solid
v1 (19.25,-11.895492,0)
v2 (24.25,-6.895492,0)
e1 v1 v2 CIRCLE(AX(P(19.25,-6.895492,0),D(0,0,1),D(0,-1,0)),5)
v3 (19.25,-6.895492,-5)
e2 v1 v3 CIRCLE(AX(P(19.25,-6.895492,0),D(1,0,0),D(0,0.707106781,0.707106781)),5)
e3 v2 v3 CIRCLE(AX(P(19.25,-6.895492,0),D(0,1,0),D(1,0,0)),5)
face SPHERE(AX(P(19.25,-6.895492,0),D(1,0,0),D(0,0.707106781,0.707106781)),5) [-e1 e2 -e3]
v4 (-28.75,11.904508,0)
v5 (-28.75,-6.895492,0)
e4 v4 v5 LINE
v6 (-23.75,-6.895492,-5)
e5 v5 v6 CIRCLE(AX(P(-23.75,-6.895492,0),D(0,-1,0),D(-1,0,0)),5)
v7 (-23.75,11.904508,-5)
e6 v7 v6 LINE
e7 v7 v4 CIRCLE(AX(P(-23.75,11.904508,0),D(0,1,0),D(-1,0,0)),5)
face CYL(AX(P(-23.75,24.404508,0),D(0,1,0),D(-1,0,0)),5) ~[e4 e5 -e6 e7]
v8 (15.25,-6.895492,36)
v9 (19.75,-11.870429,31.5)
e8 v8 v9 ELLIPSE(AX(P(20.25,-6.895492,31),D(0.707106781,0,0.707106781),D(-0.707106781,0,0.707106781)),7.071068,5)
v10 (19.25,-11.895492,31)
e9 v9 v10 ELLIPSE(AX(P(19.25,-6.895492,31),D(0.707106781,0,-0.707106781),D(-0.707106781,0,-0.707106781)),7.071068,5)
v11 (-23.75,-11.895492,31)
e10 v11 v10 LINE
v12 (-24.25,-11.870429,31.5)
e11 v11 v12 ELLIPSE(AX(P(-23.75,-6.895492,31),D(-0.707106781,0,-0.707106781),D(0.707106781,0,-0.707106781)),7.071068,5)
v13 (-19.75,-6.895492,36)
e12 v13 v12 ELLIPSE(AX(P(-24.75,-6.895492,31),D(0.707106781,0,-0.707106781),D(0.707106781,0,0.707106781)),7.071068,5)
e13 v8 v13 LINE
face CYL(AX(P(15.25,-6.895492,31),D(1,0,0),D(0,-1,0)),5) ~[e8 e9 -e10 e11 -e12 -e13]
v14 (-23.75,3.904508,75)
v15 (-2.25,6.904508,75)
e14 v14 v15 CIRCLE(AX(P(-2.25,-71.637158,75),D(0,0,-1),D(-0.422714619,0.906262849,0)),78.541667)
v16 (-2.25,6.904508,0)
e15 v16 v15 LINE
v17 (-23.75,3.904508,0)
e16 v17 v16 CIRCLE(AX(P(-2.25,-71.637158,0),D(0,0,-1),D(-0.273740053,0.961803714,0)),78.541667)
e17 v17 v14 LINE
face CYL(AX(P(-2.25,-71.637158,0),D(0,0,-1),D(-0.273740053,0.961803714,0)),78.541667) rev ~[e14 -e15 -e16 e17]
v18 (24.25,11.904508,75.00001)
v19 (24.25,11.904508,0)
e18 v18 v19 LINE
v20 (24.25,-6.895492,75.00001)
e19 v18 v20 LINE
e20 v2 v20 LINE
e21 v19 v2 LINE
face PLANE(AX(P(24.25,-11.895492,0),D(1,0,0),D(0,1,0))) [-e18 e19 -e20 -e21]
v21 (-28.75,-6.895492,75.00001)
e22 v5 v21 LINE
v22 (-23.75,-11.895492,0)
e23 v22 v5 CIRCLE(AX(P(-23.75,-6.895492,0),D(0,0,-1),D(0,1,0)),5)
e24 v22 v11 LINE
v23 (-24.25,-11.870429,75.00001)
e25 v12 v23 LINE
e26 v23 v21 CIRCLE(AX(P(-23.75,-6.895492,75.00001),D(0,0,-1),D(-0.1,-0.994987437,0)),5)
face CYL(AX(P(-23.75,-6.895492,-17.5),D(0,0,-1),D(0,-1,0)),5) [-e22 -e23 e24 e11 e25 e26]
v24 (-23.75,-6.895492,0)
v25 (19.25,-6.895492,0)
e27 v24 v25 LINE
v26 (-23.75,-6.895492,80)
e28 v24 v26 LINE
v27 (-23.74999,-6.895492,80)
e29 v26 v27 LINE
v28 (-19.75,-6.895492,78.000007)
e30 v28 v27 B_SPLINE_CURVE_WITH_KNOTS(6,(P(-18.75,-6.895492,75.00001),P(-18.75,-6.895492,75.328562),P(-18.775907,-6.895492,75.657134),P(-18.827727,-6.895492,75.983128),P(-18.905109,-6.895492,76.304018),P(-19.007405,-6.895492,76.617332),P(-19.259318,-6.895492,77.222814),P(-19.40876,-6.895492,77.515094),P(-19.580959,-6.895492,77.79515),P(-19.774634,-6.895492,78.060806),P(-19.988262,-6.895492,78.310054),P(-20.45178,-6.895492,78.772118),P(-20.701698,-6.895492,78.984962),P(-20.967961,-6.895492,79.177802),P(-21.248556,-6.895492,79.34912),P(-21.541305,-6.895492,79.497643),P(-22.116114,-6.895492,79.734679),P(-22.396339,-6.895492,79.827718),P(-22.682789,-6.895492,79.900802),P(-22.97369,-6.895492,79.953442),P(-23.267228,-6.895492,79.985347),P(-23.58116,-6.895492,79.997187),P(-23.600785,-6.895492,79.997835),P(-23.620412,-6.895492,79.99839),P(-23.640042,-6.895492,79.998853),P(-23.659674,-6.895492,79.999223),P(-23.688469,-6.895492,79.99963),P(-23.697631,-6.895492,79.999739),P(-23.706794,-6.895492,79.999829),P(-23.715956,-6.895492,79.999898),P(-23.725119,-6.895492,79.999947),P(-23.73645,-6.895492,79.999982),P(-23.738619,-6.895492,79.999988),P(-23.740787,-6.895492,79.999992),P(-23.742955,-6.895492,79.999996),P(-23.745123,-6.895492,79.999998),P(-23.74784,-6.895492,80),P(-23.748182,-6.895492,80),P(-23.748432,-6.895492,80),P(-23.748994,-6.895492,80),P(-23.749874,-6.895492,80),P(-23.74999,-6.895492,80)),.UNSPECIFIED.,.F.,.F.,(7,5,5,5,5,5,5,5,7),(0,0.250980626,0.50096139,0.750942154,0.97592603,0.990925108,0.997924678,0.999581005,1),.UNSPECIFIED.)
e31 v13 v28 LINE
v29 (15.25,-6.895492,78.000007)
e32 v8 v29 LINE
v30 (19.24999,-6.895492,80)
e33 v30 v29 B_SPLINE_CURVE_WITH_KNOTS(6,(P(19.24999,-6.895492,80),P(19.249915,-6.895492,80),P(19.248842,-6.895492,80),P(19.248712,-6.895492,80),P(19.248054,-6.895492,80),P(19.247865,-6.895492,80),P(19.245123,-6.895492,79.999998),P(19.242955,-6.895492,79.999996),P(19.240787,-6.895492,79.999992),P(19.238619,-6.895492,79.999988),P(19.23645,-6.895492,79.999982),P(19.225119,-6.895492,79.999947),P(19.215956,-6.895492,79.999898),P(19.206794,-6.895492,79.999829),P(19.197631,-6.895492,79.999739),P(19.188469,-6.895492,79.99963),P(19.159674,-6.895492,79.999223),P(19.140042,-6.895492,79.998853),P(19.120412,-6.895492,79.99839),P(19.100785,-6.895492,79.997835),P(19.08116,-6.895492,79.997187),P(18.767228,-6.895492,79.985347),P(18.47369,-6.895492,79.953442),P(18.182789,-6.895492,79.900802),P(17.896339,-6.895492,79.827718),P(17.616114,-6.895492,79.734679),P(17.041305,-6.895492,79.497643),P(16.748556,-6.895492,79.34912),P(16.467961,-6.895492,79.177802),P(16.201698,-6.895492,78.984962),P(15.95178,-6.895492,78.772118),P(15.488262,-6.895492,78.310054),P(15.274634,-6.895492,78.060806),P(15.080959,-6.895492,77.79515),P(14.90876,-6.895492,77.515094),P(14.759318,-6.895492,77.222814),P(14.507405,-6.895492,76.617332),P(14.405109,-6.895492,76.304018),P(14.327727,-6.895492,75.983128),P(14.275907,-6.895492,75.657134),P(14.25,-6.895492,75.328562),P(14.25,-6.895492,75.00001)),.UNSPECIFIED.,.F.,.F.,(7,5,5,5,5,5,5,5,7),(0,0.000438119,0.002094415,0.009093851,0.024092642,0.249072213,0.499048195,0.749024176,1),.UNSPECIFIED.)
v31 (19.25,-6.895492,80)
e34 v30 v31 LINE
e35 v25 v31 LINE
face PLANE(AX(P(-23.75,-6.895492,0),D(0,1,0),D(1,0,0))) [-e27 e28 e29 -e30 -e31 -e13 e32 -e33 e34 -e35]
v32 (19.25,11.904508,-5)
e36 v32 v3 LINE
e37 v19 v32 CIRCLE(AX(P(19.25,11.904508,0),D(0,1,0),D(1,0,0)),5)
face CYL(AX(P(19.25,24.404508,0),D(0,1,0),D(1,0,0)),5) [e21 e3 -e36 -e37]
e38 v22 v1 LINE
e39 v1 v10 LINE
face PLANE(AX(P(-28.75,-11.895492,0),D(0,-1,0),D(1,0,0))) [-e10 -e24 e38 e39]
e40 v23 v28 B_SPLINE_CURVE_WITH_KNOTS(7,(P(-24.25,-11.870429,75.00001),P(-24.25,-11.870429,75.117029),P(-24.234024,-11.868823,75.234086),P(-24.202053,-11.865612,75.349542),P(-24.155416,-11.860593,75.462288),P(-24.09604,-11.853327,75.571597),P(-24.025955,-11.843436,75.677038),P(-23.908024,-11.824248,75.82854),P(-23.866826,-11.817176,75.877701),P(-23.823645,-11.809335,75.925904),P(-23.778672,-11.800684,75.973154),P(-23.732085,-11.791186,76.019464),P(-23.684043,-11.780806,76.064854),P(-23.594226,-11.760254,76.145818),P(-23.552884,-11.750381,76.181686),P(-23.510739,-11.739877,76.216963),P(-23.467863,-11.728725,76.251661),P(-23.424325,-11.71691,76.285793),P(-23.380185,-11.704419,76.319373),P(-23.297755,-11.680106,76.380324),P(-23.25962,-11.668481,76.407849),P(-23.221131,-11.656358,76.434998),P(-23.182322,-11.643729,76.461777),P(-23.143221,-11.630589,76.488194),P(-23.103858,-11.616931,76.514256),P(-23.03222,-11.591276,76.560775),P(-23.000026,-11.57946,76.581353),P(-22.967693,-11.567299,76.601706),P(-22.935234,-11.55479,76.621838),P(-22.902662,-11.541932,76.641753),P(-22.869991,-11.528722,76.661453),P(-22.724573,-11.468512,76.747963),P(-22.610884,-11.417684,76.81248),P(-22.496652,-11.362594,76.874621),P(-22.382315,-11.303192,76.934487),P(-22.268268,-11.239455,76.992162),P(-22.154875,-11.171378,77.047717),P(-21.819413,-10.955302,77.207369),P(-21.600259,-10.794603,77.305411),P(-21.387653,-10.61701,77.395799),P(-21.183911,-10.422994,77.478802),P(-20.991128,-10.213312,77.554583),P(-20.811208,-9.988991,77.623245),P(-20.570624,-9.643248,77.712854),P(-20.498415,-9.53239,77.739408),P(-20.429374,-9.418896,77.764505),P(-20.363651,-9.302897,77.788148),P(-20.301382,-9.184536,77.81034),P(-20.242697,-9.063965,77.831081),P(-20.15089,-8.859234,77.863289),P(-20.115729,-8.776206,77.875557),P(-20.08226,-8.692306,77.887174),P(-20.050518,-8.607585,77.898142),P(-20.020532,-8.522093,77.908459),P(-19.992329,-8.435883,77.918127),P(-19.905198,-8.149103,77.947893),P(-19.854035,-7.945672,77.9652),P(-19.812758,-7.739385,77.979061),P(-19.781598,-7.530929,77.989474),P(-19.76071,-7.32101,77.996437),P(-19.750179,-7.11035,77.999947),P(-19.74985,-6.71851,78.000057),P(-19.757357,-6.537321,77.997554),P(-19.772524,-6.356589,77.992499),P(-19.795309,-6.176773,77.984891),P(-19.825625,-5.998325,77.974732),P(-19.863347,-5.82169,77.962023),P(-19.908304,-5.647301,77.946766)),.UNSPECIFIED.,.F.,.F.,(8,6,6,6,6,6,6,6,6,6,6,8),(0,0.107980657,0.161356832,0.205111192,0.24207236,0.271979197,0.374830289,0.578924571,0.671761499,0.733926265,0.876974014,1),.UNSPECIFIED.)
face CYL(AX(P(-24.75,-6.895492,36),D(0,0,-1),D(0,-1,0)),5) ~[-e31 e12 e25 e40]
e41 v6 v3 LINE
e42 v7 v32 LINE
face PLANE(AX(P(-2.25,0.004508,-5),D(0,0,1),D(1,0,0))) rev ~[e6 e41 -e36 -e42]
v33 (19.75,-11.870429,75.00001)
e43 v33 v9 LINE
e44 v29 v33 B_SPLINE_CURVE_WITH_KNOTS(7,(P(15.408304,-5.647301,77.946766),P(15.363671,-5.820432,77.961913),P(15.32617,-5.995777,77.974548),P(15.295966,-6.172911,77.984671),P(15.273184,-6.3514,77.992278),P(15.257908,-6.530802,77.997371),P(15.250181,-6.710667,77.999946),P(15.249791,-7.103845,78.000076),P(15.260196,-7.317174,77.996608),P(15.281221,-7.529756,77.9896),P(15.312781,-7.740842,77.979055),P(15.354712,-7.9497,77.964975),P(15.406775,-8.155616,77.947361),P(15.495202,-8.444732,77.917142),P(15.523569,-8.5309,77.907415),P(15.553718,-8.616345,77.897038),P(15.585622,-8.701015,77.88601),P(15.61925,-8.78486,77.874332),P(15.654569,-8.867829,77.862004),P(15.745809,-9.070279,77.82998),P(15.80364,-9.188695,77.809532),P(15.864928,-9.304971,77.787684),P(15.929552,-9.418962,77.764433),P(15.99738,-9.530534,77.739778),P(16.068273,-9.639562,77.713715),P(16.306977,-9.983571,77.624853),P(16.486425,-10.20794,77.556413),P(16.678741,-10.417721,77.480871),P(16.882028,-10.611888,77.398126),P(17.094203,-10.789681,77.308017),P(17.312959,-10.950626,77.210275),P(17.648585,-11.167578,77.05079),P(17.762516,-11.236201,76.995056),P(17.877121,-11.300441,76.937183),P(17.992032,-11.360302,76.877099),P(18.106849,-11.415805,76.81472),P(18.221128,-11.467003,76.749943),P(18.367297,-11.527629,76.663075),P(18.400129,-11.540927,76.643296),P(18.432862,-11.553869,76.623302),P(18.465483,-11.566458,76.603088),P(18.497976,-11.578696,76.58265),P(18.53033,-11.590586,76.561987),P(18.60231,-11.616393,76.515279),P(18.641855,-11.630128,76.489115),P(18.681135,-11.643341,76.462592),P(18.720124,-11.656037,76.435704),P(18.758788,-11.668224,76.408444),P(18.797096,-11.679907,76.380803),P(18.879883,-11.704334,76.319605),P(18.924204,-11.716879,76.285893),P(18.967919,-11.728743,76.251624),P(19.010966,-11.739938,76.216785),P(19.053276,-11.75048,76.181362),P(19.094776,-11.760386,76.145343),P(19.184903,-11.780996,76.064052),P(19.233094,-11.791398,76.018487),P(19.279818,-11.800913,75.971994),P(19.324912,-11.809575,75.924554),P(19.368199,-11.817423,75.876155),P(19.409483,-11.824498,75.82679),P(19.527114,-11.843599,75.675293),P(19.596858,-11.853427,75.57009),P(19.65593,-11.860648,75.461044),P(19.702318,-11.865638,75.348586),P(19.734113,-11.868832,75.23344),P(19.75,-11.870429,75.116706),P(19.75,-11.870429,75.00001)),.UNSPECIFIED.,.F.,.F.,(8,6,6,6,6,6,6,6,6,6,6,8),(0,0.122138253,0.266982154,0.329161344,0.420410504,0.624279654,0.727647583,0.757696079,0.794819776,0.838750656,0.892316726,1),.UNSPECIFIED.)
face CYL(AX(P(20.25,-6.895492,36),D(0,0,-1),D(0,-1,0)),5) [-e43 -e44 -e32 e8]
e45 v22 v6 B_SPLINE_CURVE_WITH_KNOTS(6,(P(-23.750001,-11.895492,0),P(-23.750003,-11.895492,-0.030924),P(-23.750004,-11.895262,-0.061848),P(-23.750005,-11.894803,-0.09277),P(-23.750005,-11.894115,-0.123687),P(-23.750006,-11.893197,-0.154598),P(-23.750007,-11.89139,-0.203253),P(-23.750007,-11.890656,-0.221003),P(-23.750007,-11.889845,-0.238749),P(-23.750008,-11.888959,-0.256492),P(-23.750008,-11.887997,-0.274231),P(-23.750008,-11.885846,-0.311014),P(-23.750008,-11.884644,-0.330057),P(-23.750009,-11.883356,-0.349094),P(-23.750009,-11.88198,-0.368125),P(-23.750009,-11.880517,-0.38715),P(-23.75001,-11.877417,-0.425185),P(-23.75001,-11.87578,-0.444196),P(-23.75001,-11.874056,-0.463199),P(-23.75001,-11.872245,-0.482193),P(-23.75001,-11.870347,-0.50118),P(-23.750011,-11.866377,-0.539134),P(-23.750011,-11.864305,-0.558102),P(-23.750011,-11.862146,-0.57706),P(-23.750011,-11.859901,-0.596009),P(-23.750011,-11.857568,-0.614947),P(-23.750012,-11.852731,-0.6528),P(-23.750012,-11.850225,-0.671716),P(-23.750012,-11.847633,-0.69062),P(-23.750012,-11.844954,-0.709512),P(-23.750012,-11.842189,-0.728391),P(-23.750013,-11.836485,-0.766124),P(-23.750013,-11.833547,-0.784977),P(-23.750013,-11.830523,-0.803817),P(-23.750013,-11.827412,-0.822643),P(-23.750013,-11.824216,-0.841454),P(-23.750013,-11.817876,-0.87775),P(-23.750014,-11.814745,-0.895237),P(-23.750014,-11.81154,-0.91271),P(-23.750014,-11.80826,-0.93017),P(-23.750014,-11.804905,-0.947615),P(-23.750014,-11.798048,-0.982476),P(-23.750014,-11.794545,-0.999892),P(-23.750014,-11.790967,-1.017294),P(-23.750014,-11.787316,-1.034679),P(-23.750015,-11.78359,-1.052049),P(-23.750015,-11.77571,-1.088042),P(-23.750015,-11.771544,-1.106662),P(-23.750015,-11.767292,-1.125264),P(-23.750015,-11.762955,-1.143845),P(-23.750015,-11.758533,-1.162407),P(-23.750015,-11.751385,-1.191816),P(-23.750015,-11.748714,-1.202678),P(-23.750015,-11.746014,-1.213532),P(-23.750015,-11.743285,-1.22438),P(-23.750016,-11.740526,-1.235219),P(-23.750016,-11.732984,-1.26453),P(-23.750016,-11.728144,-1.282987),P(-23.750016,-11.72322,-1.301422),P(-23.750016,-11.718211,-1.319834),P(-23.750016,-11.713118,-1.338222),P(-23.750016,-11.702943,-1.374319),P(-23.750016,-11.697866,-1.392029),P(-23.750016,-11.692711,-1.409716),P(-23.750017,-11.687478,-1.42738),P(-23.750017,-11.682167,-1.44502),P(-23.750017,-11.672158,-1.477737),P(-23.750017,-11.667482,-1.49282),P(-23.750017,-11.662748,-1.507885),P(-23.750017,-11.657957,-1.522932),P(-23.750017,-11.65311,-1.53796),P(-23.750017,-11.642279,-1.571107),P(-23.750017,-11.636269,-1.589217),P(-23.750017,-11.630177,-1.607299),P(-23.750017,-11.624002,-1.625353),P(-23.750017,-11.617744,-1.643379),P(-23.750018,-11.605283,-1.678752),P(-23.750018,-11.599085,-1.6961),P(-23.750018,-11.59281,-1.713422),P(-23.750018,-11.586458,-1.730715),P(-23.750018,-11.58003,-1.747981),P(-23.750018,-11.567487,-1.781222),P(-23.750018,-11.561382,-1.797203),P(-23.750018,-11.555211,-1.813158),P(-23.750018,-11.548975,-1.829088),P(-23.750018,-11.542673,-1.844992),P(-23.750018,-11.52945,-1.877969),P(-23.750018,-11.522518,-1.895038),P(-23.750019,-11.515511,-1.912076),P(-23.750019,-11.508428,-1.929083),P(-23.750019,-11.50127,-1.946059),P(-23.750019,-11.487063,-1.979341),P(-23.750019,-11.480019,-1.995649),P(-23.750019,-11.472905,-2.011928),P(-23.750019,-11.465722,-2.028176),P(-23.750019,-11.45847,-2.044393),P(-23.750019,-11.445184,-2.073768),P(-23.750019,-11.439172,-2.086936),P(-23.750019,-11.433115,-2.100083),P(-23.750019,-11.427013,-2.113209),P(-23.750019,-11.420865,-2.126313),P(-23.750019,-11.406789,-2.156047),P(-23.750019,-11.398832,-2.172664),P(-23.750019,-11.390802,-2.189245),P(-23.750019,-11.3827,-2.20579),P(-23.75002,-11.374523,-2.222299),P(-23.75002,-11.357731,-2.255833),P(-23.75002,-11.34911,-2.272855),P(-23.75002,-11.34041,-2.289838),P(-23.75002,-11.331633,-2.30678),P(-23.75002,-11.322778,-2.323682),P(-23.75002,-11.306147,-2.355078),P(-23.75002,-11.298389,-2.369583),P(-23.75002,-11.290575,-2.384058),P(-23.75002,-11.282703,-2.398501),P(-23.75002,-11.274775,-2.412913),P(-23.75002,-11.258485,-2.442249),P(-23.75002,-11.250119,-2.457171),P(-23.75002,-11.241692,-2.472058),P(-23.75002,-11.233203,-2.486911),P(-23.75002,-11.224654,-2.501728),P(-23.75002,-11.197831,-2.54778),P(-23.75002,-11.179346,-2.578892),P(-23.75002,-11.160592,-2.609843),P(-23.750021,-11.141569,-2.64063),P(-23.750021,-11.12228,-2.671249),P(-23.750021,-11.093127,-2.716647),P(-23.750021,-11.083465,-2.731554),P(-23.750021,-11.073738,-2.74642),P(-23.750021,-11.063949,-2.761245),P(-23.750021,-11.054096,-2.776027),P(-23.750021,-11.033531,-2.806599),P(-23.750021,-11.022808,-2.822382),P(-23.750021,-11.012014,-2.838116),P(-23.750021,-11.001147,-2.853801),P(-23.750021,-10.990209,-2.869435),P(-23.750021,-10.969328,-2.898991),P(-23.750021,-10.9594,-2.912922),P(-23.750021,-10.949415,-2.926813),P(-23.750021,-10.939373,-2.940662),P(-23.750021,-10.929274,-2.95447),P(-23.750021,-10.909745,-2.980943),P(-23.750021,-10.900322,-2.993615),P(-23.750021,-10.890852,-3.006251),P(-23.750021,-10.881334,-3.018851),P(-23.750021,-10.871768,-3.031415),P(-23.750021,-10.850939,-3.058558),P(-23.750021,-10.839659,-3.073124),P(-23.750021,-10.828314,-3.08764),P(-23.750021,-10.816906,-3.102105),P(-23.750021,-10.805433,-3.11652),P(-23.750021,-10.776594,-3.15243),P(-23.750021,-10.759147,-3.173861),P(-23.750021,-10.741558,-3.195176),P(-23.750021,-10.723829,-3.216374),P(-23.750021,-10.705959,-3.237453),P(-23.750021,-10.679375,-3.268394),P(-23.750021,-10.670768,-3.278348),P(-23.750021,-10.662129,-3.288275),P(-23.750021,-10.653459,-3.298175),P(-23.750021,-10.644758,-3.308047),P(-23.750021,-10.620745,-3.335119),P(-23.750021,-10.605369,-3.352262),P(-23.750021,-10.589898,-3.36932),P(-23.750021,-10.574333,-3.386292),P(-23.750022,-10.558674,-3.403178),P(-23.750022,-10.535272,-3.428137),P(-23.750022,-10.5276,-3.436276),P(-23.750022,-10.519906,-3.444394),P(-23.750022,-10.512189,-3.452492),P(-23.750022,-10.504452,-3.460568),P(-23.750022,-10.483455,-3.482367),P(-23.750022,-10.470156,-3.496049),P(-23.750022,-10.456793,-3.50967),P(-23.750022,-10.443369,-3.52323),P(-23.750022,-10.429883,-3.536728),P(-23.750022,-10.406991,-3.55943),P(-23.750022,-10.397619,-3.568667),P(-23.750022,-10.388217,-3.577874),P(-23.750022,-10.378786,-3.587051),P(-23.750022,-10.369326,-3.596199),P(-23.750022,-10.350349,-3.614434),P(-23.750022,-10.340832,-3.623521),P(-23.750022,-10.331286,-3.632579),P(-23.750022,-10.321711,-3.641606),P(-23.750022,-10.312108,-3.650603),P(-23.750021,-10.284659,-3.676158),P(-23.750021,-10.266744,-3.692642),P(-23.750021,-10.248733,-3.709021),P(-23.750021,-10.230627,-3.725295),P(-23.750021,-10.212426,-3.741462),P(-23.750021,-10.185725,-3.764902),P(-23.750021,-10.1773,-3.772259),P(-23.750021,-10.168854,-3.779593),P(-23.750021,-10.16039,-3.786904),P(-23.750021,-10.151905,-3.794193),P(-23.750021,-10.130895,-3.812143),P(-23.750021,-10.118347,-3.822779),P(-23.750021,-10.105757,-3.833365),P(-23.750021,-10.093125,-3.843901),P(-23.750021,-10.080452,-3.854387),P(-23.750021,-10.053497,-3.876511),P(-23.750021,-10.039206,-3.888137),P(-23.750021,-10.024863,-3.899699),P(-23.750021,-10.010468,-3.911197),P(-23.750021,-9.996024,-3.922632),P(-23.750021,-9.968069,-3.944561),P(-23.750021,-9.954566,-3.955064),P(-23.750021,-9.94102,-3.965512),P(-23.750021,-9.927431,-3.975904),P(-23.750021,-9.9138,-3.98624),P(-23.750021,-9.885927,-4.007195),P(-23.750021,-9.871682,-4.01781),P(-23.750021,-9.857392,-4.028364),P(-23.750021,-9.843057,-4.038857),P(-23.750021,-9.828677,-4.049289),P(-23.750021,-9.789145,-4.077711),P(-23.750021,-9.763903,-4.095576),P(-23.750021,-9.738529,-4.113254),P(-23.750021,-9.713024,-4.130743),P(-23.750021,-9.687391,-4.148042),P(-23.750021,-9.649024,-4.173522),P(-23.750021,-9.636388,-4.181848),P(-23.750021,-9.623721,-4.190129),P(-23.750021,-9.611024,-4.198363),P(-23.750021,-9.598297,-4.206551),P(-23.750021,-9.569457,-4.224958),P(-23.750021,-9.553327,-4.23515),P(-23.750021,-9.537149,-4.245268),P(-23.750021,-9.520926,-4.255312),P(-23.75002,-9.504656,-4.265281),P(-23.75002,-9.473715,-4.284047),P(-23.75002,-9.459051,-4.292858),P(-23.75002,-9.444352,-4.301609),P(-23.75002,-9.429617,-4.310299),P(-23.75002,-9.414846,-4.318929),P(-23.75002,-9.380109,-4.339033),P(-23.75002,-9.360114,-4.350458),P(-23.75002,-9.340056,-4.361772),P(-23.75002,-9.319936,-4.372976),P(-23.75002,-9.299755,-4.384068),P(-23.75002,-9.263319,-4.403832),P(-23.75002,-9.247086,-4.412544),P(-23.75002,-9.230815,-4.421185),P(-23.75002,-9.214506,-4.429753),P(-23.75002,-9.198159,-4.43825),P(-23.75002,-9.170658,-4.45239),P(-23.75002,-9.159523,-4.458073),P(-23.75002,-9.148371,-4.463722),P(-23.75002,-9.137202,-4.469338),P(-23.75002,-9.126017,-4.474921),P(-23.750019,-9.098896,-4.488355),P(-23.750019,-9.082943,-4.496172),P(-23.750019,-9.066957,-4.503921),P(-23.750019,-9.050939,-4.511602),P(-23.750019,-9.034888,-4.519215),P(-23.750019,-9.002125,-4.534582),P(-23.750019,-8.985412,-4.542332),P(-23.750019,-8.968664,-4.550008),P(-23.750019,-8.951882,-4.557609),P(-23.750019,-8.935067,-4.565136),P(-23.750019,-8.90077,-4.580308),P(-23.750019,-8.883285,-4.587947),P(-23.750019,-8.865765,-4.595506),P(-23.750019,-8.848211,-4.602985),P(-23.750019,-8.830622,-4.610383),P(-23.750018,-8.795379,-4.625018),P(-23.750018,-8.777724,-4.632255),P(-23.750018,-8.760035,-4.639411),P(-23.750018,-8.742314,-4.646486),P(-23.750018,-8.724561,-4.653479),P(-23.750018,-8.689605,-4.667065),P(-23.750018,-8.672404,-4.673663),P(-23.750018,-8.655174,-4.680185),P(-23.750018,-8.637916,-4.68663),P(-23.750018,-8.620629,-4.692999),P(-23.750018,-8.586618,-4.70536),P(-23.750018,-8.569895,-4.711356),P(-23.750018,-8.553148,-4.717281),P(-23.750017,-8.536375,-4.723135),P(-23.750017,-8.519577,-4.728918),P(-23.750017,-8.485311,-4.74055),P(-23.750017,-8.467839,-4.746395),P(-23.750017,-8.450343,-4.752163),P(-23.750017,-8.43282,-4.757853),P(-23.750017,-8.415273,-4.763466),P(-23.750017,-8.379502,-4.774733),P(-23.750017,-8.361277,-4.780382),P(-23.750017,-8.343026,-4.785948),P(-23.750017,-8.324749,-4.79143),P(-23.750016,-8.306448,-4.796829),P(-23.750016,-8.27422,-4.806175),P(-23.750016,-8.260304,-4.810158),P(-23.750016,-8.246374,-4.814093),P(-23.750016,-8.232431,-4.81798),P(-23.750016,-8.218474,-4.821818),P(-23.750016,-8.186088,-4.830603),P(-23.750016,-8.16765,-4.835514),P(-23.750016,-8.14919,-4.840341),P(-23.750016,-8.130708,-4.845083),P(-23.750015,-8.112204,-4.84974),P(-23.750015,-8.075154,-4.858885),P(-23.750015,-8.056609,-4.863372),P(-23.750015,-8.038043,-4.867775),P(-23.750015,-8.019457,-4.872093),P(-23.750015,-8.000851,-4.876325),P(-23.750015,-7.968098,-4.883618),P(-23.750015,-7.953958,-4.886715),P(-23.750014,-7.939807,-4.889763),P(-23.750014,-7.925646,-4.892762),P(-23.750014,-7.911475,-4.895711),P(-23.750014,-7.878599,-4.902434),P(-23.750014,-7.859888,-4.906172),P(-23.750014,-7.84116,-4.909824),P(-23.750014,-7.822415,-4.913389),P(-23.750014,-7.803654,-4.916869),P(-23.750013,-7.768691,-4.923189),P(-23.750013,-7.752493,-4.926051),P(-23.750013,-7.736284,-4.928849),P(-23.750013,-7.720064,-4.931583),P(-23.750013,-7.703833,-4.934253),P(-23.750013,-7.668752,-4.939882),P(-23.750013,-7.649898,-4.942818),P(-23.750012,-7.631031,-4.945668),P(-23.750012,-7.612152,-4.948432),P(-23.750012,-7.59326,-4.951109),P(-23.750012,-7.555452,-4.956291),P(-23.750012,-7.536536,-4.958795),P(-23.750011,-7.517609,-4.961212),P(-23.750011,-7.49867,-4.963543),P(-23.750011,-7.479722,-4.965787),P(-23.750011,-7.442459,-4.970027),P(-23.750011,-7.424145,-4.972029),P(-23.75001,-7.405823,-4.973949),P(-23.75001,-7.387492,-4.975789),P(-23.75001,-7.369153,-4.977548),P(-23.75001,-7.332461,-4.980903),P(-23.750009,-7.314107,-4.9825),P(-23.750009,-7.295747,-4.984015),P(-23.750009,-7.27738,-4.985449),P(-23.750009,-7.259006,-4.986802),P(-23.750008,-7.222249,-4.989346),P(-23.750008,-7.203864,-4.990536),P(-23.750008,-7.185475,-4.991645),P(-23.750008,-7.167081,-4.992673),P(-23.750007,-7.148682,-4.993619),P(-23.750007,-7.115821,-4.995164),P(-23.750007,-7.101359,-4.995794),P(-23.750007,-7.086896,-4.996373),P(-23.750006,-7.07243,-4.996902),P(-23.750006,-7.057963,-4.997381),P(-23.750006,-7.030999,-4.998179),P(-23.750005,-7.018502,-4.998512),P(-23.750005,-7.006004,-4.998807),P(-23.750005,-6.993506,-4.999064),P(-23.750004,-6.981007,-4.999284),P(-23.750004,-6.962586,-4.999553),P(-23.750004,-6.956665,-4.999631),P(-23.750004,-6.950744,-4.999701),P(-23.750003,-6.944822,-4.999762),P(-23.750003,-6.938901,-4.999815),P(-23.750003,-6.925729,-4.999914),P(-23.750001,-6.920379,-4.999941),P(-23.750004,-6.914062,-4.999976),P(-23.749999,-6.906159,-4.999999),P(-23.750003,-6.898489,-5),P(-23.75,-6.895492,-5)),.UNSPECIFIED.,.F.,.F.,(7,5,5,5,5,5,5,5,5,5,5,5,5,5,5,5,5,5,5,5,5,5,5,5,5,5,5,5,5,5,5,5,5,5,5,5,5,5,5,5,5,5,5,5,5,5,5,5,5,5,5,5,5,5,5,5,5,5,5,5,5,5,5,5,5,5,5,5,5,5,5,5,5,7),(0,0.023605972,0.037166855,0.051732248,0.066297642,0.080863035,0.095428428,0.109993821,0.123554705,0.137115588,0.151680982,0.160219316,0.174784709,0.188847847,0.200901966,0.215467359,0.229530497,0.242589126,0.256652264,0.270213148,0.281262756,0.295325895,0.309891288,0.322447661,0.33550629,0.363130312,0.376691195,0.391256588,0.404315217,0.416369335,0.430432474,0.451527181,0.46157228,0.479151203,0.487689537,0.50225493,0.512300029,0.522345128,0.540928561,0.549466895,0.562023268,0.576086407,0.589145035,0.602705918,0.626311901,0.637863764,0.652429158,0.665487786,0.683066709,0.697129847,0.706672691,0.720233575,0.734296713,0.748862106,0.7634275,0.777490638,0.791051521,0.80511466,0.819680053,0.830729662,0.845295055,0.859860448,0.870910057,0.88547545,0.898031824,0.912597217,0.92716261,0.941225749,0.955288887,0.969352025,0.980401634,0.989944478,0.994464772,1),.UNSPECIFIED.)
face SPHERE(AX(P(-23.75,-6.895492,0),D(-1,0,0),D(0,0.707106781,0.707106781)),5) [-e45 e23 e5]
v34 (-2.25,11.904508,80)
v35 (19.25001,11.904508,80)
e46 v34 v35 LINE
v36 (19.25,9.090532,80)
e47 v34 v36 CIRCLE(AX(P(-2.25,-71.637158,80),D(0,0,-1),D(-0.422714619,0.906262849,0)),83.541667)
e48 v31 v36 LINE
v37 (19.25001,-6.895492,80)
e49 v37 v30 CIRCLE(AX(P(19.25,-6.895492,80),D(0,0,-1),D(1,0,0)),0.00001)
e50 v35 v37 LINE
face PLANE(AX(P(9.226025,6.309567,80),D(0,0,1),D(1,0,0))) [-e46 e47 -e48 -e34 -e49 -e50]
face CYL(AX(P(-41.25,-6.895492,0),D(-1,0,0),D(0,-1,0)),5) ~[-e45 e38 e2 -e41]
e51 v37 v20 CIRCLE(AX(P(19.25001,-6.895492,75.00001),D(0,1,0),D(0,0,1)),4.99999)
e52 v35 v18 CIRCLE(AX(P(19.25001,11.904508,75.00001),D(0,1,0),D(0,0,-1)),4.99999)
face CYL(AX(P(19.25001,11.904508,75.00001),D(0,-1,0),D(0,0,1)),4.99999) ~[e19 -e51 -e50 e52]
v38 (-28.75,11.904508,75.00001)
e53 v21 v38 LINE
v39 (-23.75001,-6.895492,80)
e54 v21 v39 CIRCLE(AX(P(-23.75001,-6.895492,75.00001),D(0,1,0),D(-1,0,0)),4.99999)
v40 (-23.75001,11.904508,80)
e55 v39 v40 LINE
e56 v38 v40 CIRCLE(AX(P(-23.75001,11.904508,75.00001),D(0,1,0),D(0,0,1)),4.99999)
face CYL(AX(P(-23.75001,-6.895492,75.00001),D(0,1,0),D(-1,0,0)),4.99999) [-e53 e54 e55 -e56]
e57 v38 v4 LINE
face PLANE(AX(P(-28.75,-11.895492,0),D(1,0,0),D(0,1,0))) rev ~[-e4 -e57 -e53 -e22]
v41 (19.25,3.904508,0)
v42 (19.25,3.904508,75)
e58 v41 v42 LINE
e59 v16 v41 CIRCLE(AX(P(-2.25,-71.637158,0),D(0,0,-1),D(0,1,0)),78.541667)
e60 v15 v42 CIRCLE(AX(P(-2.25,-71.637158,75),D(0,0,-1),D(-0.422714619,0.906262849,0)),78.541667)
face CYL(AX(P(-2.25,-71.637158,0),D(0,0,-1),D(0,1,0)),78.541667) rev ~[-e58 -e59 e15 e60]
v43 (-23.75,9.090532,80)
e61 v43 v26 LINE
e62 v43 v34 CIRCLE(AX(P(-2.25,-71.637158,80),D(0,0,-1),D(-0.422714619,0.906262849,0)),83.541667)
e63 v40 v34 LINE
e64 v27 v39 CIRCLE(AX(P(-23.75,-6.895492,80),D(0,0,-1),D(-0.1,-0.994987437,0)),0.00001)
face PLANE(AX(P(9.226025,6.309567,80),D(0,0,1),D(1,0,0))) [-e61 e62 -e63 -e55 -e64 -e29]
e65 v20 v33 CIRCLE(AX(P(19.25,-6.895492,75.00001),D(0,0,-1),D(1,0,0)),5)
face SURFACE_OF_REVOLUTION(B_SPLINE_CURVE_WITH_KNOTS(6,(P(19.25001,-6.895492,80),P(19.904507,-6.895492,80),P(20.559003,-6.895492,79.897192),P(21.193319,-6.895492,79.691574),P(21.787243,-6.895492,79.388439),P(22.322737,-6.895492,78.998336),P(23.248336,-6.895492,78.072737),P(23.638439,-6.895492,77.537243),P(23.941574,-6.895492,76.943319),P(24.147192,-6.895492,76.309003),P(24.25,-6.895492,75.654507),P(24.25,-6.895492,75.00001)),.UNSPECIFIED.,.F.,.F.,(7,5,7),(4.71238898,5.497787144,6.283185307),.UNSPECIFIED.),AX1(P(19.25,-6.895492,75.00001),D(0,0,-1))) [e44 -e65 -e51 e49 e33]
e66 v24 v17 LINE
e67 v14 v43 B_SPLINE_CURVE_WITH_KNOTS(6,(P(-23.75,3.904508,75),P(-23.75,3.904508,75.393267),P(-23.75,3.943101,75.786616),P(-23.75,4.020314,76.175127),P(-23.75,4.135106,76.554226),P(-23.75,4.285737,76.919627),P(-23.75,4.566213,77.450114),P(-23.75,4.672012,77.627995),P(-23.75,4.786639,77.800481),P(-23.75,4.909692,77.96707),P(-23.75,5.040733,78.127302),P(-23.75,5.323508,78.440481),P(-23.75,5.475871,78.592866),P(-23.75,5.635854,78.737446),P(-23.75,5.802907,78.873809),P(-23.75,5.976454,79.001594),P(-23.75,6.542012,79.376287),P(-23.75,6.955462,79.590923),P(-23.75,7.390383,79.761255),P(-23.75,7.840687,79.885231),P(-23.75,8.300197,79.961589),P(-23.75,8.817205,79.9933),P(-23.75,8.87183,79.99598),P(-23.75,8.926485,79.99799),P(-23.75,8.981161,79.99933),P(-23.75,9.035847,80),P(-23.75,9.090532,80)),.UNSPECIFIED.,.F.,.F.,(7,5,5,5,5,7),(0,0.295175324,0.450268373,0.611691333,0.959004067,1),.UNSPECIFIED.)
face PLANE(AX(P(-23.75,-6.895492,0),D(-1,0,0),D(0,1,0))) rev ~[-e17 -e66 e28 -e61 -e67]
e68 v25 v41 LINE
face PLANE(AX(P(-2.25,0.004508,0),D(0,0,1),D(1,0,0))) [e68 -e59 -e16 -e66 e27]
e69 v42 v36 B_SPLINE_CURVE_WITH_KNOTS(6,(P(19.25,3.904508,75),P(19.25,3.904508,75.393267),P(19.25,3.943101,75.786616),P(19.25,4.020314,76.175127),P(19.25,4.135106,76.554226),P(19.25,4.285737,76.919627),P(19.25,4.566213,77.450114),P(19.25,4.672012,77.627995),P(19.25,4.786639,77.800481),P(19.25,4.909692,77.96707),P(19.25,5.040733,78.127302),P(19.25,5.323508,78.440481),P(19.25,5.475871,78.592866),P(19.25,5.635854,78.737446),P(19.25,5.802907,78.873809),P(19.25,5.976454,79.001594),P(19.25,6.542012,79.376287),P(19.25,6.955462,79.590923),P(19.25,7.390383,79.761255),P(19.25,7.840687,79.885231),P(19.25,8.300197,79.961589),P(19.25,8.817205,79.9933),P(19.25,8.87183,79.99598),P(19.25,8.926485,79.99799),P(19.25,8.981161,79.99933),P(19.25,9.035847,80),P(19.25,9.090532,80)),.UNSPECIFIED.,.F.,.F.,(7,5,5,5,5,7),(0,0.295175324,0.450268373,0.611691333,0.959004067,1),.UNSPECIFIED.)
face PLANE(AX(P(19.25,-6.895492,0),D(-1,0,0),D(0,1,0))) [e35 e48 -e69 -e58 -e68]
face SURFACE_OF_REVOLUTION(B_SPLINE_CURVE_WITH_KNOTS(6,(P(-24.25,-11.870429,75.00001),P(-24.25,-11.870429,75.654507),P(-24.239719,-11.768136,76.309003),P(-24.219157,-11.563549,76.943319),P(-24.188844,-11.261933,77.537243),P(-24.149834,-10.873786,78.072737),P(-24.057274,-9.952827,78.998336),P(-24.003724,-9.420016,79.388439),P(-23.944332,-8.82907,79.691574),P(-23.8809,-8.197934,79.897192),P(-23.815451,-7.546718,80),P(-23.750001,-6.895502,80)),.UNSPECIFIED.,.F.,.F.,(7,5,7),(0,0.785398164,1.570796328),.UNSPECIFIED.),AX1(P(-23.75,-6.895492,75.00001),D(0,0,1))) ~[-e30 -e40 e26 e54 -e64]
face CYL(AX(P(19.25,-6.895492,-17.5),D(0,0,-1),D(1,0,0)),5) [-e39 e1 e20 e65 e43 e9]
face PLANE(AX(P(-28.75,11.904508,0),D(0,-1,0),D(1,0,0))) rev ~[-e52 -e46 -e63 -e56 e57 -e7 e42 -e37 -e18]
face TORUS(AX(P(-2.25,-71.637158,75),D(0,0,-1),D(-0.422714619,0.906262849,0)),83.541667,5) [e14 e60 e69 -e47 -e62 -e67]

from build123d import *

# Parameters (mm, degrees)
F0_W         = 53
F0_H         = 23.8
F0_W_2       = 43
F0_H_2       = 13.8
F1_DEPTH     = 80
F2_DEPTH     = 5
F3_W         = 35
F3_H         = 44
F4_DEPTH     = 25
F5_T1_DEPTH  = 78
F5_T3_DEPTH  = 110
F5_T5_DEPTH  = 35
F5_T7_DEPTH  = 56.5
F5_T13_DEPTH = 69
F5_T17_DEPTH = 47.5
F5_T24_DEPTH = 47.5
F5_T28_DEPTH = 69
F6_T1_DEPTH  = 31.3
F6_S5_W      = 5
F6_S5_H      = 5
F6_T6_DEPTH  = 5
F6_S11_W     = 5
F6_S11_H     = 5
F6_T12_DEPTH = 5
F7_R         = 4.99999
F9_DEPTH     = 80
F10_T4_ANGLE = 50.0121835392


# Not quite as in the source:
# - a fillet or chamfer that OpenCascade refuses, or shapes differently, is made with other operations: its cross-section is extruded or revolved along the edge and cut away or added
# - a fillet or chamfer is up to 0.001 mm smaller than in the source, because OpenCascade refuses the exact size


with BuildPart() as f1:
    # F0 (on Top) → F1 (new body)
    with BuildSketch(Plane.XY):
        with Locations((-2.25, 0.0045082584)):
            Rectangle(F0_W, F0_H)
        with Locations((-2.25, 0.0045082584)):
            Rectangle(F0_W_2, F0_H_2, mode=Mode.SUBTRACT)
    extrude(amount=F1_DEPTH)

    # F0 (on Top) → F2 (join)
    with BuildSketch(Plane.XY):
        with Locations((-2.25, 0.0045082584)):
            Rectangle(F0_W, F0_H)
        with Locations((-2.25, 0.0045082584)):
            Rectangle(F0_W_2, F0_H_2, mode=Mode.SUBTRACT)
        with Locations((-2.25, 0.0045082584)):
            Rectangle(F0_W_2, F0_H_2)
    extrude(amount=-F2_DEPTH)

    # F3 (on face) → F4 (cut)
    with BuildSketch(Plane(origin=(0, -6.8954917416, 0), x_dir=(-1, 0, 0), z_dir=(0, 1, 0))):
        with Locations((2.25, 58)):
            Rectangle(F3_W, F3_H)
    extrude(amount=-F4_DEPTH, mode=Mode.SUBTRACT)

    # F5: fillet of radius 5 on 6 edges, made by hand

    # F5_s2 → F5_t1 (cut)
    with BuildSketch(Plane.YZ.offset(-41.25)):
        with BuildLine():
            ThreePointArc((-11.8954917416, 0), (-10.4310256475, -3.5355339059), (-6.8954917416, -5))
            Line((-6.8954917416, -5), (-11.8954917416, -5))
            Line((-11.8954917416, -5), (-11.8954917416, 0))
        make_face()
    extrude(amount=F5_T1_DEPTH, mode=Mode.SUBTRACT)

    # F5_s4 → F5_t3 (cut)
    with BuildSketch(Plane.XY.offset(-17.5)):
        with BuildLine():
            ThreePointArc((-23.75, -11.8954917416), (-27.2855339059, -10.4310256475), (-28.75, -6.8954917416))
            Line((-28.75, -6.8954917416), (-28.75, -11.8954917416))
            Line((-28.75, -11.8954917416), (-23.75, -11.8954917416))
        make_face()
        with BuildLine():
            ThreePointArc((24.25, -6.8954917416), (22.7855339059, -10.4310256475), (19.25, -11.8954917416))
            Line((19.25, -11.8954917416), (24.25, -11.8954917416))
            Line((24.25, -11.8954917416), (24.25, -6.8954917416))
        make_face()
    extrude(amount=F5_T3_DEPTH, mode=Mode.SUBTRACT)

    # F5_s6 → F5_t5 (cut)
    with BuildSketch(Plane.YZ.offset(-19.75)):
        with BuildLine():
            ThreePointArc((-11.8954917416, 31), (-10.4310256475, 34.5355339059), (-6.8954917416, 36))
            Line((-6.8954917416, 36), (-11.8954917416, 36))
            Line((-11.8954917416, 36), (-11.8954917416, 31))
        make_face()
    extrude(amount=F5_T5_DEPTH, mode=Mode.SUBTRACT)

    # F5_s8 → F5_t7 (cut)
    with BuildSketch(Plane.XY.offset(36)):
        with BuildLine():
            ThreePointArc((-24.75, -11.8954917416), (-21.2144660941, -10.4310256475), (-19.75, -6.8954917416))
            Line((-19.75, -6.8954917416), (-19.75, -11.8954917416))
            Line((-19.75, -11.8954917416), (-24.75, -11.8954917416))
        make_face()
        with BuildLine():
            ThreePointArc((20.25, -11.8954917416), (16.7144660941, -10.4310256475), (15.25, -6.8954917416))
            Line((15.25, -6.8954917416), (15.25, -11.8954917416))
            Line((15.25, -11.8954917416), (20.25, -11.8954917416))
        make_face()
    extrude(amount=F5_T7_DEPTH, mode=Mode.SUBTRACT)


with BuildPart() as f5_tool11:
    # F5_s12 → F5_t13 (new body)
    with BuildSketch(Plane.XY.offset(92.5)):
        with BuildLine():
            ThreePointArc((20.25, -11.8954917416), (16.7144660941, -10.4310256475), (15.25, -6.8954917416))
            Line((15.25, -6.8954917416), (15.25, -11.8954917416))
            Line((15.25, -11.8954917416), (20.25, -11.8954917416))
        make_face()
    extrude(amount=-F5_T13_DEPTH)

    split(bisect_by=Plane.XY.offset(36), keep=Keep.BOTTOM)


with BuildPart() as f5_tool15:
    # F5_s16 → F5_t17 (new body)
    with BuildSketch(Plane.YZ.offset(27.75)):
        with BuildLine():
            ThreePointArc((-11.8954917416, 31), (-10.4310256475, 34.5355339059), (-6.8954917416, 36))
            Line((-6.8954917416, 36), (-11.8954917416, 36))
            Line((-11.8954917416, 36), (-11.8954917416, 31))
        make_face()
    extrude(amount=-F5_T17_DEPTH)

    split(bisect_by=Plane.YZ.offset(15.25), keep=Keep.TOP)


with BuildPart() as f5_tool11_1:
    add(f5_tool11.part)

    # F5_t19: intersect F5_tool15
    add(f5_tool15.part, mode=Mode.INTERSECT)


with BuildPart() as f1_1:
    add(f1.part)

    # F5_t9: cut F5_tool11
    add(f5_tool11_1.part, mode=Mode.SUBTRACT)


with BuildPart() as f5_tool22:
    # F5_s23 → F5_t24 (new body)
    with BuildSketch(Plane.YZ.offset(15.25)):
        with BuildLine():
            ThreePointArc((-11.8954917416, 31), (-10.4310256475, 34.5355339059), (-6.8954917416, 36))
            Line((-6.8954917416, 36), (-11.8954917416, 36))
            Line((-11.8954917416, 36), (-11.8954917416, 31))
        make_face()
    extrude(amount=-F5_T24_DEPTH)

    split(bisect_by=Plane.YZ.offset(-19.75), keep=Keep.BOTTOM)


with BuildPart() as f5_tool26:
    # F5_s27 → F5_t28 (new body)
    with BuildSketch(Plane.XY.offset(23.5)):
        with BuildLine():
            ThreePointArc((-24.75, -11.8954917416), (-21.2144660941, -10.4310256475), (-19.75, -6.8954917416))
            Line((-19.75, -6.8954917416), (-19.75, -11.8954917416))
            Line((-19.75, -11.8954917416), (-24.75, -11.8954917416))
        make_face()
    extrude(amount=F5_T28_DEPTH)

    split(bisect_by=Plane.XY.offset(36), keep=Keep.BOTTOM)


with BuildPart() as f5_tool22_1:
    add(f5_tool22.part)

    # F5_t30: intersect F5_tool26
    add(f5_tool26.part, mode=Mode.INTERSECT)


with BuildPart() as f1_2:
    add(f1_1.part)

    # F5_t20: cut F5_tool22
    add(f5_tool22_1.part, mode=Mode.SUBTRACT)

    # F6: fillet of radius 5 on 2 edges, made by hand

    # F6_s2 → F6_t1 (cut)
    with BuildSketch(Plane.XZ.offset(-24.4045082584)):
        with BuildLine():
            ThreePointArc((24.25, 0), (22.7855339059, -3.5355339059), (19.25, -5))
            Line((19.25, -5), (24.25, -5))
            Line((24.25, -5), (24.25, 0))
        make_face()
        with BuildLine():
            ThreePointArc((-28.75, 0), (-27.2855339059, -3.5355339059), (-23.75, -5))
            Line((-23.75, -5), (-28.75, -5))
            Line((-28.75, -5), (-28.75, 0))
        make_face()
    extrude(amount=F6_T1_DEPTH, mode=Mode.SUBTRACT)


with BuildPart() as f6_tool4:
    # F6_s5 → F6_t6 (new body)
    with BuildSketch(Plane.YZ.offset(-23.75)):
        with Locations((-9.3954917416, -2.5)):
            Rectangle(F6_S5_W, F6_S5_H)
    extrude(amount=-F6_T6_DEPTH)

    # F6_s7 → F6_t8 (revolve, cut)
    with BuildSketch(Plane(origin=(-23.75, -6.8954917416, 0), x_dir=(0, 0.7071067812, 0.7071067812), z_dir=(0, -0.7071067812, 0.7071067812))):
        with BuildLine():
            ThreePointArc((0, -5), (5, 0), (0, 5))
            Line((0, 5), (0, -5))
        make_face()
    revolve(axis=Axis((-23.75, -6.8954917416, 0), (-1, 0, 0)), mode=Mode.SUBTRACT)


with BuildPart() as f1_3:
    add(f1_2.part)

    # F6_t3: cut F6_tool4
    add(f6_tool4.part, mode=Mode.SUBTRACT)


with BuildPart() as f6_tool10:
    # F6_s11 → F6_t12 (new body)
    with BuildSketch(Plane.YZ.offset(19.25)):
        with Locations((-9.3954917416, -2.5)):
            Rectangle(F6_S11_W, F6_S11_H)
    extrude(amount=F6_T12_DEPTH)

    # F6_s13 → F6_t14 (revolve, cut)
    with BuildSketch(Plane(origin=(19.25, -6.8954917416, 0), x_dir=(0, 0.7071067812, 0.7071067812), z_dir=(0, 0.7071067812, -0.7071067812))):
        with BuildLine():
            ThreePointArc((0, -5), (5, 0), (0, 5))
            Line((0, 5), (0, -5))
        make_face()
    revolve(axis=Axis((19.25, -6.8954917416, 0), (1, 0, 0)), mode=Mode.SUBTRACT)


with BuildPart() as f1_4:
    add(f1_3.part)

    # F6_t9: cut F6_tool10
    add(f6_tool10.part, mode=Mode.SUBTRACT)

    # F7 (radius 5 in the source; OpenCascade refuses exactly that, so slightly less here)
    f7_edges = [f1_4.edges().sort_by_distance(p)[0] for p in [
        (22.958099, -10.249594, 80),
        (-28.75, 2.504508, 80),
    ]]
    fillet(f7_edges, radius=F7_R)

    # F8 (on face) → F9 (join)
    with BuildSketch(Plane.XY):
        with BuildLine():
            ThreePointArc((-2.25, 6.9045082584), (8.604146673, 6.1508927486), (19.25, 3.9045082584))
            Line((19.25, 3.9045082584), (19.25, 6.9045082584))
            Line((19.25, 6.9045082584), (-2.25, 6.9045082584))
        make_face()
        with BuildLine():
            ThreePointArc((-23.75, 3.9045082584), (-13.104146673, 6.1508927486), (-2.25, 6.9045082584))
            Line((-2.25, 6.9045082584), (-23.75, 6.9045082584))
            Line((-23.75, 6.9045082584), (-23.75, 3.9045082584))
        make_face()
    extrude(amount=F9_DEPTH)

    # F10: fillet of radius 5 on 1 edges, made by hand


with BuildPart() as f10_tool2:
    # F10_s3 → F10_t4 (revolve)
    with BuildSketch(Plane(origin=(-29.2914715623, -13.6626291921, 0), x_dir=(0, 0, 1), z_dir=(-0.9062628485, -0.4227146193, 0))):
        with BuildLine():
            ThreePointArc((75, 14.5706793202), (78.5355339059, 16.0351454142), (80, 19.5706793202))
            Line((80, 19.5706793202), (80, 14.5706793202))
            Line((80, 14.5706793202), (75, 14.5706793202))
        make_face()
    revolve(axis=Axis((-2.25, -71.6371584083, 80), (0, 0, -1)), revolution_arc=F10_T4_ANGLE)

    split(bisect_by=Plane.YZ.offset(19.25), keep=Keep.BOTTOM)

    split(bisect_by=Plane.YZ.offset(-23.75), keep=Keep.TOP)


with BuildPart() as f1_5:
    add(f1_4.part)

    # F10_t1: cut F10_tool2
    add(f10_tool2.part, mode=Mode.SUBTRACT)


solid = f1_5.part
